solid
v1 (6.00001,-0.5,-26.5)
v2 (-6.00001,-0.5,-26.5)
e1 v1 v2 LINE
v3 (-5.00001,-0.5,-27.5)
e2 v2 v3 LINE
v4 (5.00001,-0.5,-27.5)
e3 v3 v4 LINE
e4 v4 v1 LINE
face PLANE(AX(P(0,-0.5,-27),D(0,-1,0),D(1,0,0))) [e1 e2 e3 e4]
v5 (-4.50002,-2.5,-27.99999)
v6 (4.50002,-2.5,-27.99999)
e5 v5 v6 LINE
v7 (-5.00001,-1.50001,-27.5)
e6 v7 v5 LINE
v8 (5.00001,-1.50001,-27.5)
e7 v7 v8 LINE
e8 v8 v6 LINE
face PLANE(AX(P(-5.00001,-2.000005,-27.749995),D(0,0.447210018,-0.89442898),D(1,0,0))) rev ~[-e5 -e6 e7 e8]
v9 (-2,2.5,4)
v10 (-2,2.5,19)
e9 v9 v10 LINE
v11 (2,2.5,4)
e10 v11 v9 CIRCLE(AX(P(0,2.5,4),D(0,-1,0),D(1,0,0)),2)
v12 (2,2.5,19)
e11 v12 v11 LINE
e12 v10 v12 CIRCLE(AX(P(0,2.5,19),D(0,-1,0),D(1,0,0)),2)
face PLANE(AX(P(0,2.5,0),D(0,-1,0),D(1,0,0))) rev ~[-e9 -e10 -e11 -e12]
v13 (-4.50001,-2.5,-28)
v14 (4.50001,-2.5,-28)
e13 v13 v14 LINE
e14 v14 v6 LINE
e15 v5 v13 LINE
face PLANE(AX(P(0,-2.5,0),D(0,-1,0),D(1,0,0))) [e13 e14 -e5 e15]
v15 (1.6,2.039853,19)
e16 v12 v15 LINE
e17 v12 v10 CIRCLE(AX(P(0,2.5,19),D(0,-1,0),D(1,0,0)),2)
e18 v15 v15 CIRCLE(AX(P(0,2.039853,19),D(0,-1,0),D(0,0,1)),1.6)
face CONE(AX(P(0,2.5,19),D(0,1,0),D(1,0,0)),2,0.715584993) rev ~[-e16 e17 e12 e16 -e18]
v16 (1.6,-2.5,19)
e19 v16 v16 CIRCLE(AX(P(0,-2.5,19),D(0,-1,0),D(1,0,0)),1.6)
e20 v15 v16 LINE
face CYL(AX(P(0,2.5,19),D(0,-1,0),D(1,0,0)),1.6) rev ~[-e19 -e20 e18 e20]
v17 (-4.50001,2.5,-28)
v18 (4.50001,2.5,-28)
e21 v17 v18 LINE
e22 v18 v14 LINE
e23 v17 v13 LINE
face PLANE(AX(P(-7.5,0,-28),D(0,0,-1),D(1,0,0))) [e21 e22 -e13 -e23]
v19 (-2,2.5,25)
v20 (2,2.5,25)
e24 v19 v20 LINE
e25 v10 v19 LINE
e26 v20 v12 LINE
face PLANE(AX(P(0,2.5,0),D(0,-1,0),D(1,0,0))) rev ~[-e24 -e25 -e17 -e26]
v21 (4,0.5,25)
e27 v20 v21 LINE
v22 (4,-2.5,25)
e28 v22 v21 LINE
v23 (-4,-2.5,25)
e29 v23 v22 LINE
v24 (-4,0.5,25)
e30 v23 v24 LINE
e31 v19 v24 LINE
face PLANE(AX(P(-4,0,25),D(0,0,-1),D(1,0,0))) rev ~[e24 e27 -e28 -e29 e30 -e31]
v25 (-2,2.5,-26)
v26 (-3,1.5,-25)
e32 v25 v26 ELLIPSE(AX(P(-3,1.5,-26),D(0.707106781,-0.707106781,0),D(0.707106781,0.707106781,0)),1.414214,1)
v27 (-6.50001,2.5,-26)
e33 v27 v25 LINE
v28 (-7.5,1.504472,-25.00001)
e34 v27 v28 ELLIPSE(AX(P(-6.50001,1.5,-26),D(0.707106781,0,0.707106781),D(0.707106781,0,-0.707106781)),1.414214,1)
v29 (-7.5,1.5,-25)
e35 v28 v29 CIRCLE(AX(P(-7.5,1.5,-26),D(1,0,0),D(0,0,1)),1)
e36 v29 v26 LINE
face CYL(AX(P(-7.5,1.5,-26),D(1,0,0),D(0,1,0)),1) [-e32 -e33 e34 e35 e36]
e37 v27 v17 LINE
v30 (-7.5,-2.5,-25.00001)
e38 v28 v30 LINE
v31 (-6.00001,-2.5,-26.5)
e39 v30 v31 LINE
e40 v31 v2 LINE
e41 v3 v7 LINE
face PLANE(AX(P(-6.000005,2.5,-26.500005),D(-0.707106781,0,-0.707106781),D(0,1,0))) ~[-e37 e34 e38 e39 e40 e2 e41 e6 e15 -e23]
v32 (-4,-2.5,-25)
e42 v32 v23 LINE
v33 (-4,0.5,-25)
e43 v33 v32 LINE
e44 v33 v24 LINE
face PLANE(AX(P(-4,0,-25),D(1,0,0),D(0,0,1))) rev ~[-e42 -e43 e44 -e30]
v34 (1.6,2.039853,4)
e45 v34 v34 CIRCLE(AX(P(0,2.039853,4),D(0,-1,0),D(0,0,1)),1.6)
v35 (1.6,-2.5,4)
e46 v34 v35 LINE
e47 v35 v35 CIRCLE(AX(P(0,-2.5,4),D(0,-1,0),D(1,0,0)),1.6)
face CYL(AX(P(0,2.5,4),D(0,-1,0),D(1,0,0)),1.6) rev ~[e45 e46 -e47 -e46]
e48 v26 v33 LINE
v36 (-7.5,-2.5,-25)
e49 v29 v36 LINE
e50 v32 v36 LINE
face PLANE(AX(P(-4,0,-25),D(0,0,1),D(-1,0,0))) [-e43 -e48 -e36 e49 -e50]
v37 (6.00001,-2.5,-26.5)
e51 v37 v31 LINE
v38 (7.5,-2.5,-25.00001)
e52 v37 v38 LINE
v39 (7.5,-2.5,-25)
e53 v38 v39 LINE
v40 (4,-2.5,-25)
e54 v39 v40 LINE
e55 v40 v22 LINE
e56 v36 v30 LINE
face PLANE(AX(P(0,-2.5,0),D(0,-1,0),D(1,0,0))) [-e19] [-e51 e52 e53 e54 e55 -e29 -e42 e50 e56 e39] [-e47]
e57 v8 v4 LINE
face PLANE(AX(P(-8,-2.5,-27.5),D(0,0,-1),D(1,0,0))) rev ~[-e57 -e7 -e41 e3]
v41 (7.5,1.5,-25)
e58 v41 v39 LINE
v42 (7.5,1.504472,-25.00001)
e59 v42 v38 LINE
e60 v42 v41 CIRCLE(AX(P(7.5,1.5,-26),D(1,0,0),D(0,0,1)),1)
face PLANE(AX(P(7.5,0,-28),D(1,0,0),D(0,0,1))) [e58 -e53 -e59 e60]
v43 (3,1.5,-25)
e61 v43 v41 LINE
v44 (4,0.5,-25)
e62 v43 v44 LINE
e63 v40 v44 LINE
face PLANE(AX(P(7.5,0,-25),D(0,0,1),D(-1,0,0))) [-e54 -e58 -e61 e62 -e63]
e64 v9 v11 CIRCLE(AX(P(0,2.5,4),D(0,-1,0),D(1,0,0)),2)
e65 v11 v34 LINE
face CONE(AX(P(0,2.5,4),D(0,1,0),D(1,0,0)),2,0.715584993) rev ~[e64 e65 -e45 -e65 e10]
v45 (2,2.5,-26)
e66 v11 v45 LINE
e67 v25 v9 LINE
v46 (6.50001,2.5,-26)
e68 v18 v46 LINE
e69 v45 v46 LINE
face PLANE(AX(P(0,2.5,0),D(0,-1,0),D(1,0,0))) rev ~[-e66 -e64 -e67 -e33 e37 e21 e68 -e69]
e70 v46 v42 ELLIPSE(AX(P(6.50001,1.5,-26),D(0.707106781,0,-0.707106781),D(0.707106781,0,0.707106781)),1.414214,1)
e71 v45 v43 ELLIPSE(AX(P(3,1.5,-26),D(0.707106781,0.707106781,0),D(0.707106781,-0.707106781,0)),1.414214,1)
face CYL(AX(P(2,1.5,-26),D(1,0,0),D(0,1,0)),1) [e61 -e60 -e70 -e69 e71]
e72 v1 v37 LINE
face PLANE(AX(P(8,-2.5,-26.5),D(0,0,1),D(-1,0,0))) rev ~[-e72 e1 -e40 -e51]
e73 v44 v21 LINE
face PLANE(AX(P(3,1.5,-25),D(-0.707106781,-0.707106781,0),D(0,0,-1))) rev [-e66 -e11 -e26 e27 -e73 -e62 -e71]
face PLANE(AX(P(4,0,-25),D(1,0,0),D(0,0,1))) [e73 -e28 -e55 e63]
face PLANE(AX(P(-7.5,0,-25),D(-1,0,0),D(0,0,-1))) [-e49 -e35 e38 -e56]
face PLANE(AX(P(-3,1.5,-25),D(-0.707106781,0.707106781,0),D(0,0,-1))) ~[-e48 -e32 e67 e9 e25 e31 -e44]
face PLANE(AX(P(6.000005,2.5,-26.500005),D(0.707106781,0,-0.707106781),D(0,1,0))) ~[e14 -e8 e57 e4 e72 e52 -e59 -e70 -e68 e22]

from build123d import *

# Parameters (mm, degrees)
F0_W           = 8
F0_H           = 50
F1_DEPTH       = 2.5
F2_W           = 15
F2_H           = 1
F2_W_2         = 0.5
F3_DEPTH       = 2
F4_SIZE        = 2.99999
F5_SIZE        = 2
F6_SIZE2       = 0.49999
F6_SIZE        = 0.99999
F7_R           = 1
F9_D           = 3.2
F9_CSINK_D     = 4
F9_CSINK_ANGLE = 82


# Not quite as in the source:
# - a fillet or chamfer is up to 0.001 mm smaller than in the source, because OpenCascade refuses the exact size


with BuildPart() as f1:
    # F0 (on Front) → F1 (new body, symmetric)
    with BuildSketch(Plane.XZ):
        Rectangle(F0_W, F0_H)
        Polygon((7.5, -25), (4, -25), (-4, -25), (-7.5, -25), (-7.5, -28), (7.5, -28), align=None)
    extrude(amount=F1_DEPTH, both=True)

    # F2 (on face) → F3 (cut)
    with BuildSketch(Plane.XZ.offset(2.5)):
        with Locations((0, -27)):
            Rectangle(F2_W, F2_H)
        with Locations((-7.75, -27)):
            Rectangle(F2_W_2, F2_H)
        with Locations((7.75, -27)):
            Rectangle(F2_W_2, F2_H)
    extrude(amount=-F3_DEPTH, mode=Mode.SUBTRACT)

    # F4 (size 3 in the source; OpenCascade refuses exactly that, so slightly less here)
    f4_edges = [f1.edges().sort_by_distance(p)[0] for p in [
        (-7.5, 0, -28),
        (7.5, 0, -28),
    ]]
    chamfer(f4_edges, length=F4_SIZE)

    # F5
    f5_edges = [f1.edges().sort_by_distance(p)[0] for p in [
        (-4, 2.5, 0),
        (4, 2.5, 0),
    ]]
    chamfer(f5_edges, length=F5_SIZE)

    # F6 (size 1 and 0.5 in the source; OpenCascade refuses exactly that, so slightly less here)
    f6_edges = [f1.edges().sort_by_distance(p)[0] for p in [
        (0, -2.5, -27.5),
    ]]
    f6_side = f1.faces().sort_by_distance((0, -1.5, -27.5))[0]
    chamfer(f6_edges, length=F6_SIZE, length2=F6_SIZE2, reference=f6_side)

    # F7
    f7_edges = [f1.edges().sort_by_distance(p)[0] for p in [
        (-5.75, 2.5, -25),
        (5.75, 2.5, -25),
    ]]
    fillet(f7_edges, radius=F7_R)

    # F9 (through all)
    with Locations(Plane(origin=(0, 2.5, 0), x_dir=(-1, 0, 0), z_dir=(0, 1, 0))):
        with Locations((0, 19), (0, 4)):
            CounterSinkHole(F9_D / 2, F9_CSINK_D / 2, counter_sink_angle=F9_CSINK_ANGLE)


solid = f1.part
